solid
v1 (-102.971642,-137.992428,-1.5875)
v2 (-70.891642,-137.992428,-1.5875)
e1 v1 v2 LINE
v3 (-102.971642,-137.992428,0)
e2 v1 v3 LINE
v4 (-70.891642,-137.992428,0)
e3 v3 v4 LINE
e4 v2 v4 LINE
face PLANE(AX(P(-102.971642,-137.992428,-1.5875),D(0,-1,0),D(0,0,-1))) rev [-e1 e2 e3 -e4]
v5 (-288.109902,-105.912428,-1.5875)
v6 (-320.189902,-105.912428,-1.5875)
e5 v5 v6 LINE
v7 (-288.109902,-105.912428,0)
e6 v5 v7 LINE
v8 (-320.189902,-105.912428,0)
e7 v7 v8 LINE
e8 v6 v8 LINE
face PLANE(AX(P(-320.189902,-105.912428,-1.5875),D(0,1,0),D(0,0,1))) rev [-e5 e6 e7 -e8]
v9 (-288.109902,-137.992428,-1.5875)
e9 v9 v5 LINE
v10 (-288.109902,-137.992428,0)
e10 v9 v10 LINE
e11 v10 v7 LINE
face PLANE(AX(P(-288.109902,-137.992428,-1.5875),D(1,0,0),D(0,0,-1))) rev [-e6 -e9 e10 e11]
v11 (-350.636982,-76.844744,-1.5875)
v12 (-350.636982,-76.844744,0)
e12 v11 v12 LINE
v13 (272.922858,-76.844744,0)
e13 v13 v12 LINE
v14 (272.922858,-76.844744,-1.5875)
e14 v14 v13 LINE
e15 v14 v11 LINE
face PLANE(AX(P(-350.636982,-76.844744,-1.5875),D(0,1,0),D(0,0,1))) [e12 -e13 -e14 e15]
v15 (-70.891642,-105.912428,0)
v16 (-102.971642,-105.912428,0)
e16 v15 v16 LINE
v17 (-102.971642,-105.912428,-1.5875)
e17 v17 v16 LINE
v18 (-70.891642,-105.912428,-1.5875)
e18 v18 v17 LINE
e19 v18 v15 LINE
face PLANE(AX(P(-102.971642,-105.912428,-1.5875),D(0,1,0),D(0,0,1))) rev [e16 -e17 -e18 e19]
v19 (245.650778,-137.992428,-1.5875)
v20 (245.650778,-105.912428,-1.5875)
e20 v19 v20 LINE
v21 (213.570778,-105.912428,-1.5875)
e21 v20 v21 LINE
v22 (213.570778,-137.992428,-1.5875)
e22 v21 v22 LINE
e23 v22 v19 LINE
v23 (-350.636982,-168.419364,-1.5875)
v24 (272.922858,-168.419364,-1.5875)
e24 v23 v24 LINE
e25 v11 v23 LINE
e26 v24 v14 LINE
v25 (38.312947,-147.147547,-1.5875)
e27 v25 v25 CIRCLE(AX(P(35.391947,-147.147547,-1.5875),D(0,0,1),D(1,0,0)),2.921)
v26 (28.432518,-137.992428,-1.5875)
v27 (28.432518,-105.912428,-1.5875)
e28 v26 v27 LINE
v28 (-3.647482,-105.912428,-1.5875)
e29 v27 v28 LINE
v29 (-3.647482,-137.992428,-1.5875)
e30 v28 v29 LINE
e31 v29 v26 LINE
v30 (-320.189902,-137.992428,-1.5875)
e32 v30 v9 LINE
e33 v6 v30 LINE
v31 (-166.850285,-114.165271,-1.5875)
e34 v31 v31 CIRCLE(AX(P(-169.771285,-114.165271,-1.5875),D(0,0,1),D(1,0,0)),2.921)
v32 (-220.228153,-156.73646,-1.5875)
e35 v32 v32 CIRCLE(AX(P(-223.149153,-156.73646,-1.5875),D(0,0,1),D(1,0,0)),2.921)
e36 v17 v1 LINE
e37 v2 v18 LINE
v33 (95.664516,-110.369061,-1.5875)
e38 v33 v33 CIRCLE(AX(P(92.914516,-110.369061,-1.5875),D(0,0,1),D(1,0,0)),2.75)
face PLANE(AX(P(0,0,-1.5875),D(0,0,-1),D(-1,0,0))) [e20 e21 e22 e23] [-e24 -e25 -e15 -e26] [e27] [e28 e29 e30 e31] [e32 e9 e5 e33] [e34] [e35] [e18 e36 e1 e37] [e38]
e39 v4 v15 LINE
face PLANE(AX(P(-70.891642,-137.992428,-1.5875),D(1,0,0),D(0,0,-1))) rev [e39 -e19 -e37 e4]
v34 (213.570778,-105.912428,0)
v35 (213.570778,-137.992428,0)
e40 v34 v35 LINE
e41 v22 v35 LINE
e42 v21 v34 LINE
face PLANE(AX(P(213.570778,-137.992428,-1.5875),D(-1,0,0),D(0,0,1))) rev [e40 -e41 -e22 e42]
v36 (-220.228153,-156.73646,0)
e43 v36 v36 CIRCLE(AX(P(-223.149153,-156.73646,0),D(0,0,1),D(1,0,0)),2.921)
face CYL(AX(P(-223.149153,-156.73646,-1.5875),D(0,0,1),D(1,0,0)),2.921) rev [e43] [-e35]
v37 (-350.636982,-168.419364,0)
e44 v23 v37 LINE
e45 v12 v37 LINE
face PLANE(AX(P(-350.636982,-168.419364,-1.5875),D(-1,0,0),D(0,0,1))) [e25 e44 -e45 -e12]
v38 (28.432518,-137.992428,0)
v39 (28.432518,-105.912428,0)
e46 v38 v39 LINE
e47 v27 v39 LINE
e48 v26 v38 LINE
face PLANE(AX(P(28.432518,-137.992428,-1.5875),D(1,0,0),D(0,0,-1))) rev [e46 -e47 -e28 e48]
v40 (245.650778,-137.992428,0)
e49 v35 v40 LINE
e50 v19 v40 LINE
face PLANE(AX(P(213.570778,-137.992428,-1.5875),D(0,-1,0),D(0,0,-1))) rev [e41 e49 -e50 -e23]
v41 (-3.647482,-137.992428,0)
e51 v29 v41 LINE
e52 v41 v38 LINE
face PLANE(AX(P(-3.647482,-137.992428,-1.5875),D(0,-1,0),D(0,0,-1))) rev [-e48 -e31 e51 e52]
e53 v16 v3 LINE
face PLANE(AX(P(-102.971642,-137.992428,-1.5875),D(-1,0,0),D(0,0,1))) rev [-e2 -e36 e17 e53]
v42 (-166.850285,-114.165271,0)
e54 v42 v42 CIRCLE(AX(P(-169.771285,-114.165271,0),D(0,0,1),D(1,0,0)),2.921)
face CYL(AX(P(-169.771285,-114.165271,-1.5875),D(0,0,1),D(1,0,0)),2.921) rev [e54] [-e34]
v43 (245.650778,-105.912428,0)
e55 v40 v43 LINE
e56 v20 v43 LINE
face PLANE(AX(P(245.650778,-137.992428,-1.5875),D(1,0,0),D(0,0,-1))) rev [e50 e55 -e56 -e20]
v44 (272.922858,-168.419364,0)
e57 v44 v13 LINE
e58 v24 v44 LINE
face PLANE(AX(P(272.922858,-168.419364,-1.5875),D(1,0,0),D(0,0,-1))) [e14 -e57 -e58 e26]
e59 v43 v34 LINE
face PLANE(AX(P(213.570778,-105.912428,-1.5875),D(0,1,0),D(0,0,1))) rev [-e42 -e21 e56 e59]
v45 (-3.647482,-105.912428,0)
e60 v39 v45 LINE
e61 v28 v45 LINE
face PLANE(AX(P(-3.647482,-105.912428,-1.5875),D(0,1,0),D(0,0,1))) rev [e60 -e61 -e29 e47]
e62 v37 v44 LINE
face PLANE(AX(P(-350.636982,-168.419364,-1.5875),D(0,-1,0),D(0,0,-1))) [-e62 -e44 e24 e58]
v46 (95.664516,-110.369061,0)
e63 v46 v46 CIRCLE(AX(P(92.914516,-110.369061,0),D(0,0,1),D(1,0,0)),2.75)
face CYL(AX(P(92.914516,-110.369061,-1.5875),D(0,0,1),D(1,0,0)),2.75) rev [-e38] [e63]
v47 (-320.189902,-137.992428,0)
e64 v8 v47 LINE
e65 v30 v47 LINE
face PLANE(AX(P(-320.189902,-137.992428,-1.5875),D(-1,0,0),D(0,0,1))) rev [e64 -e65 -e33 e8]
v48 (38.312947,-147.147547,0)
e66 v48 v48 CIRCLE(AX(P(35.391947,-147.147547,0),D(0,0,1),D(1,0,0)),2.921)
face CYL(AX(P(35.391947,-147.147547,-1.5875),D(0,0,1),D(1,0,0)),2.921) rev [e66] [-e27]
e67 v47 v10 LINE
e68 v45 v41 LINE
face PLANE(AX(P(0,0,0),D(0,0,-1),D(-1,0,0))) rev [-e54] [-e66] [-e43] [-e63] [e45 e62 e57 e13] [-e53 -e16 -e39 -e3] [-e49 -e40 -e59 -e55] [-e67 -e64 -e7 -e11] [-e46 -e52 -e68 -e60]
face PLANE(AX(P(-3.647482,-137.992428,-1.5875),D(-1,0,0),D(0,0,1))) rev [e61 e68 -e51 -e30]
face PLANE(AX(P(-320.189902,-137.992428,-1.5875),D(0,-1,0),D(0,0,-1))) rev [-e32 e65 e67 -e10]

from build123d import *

# Parameters (mm, degrees)
SKETCH1_W           = 623.55984
SKETCH1_H           = 78.16342
BASE_FLANGE1_DEPTH  = 1.5875
SKETCH3_R           = 2.75
SKETCH3_R_2         = 2.921
SKETCH3_W           = 32.08
SKETCH3_H           = 32.08
CUT_EXTRUDE3_DEPTH  = 389.990867909
SKETCH6_W           = 623.55984
SKETCH6_H           = 13.4112
BOSS_EXTRUDE1_DEPTH = 1.5875


# Sheet-metal steps are written as plain solids
with BuildPart() as part:
    # Sketch1 → Base-Flange1 (new body)
    with BuildSketch(Plane.XY):
        with Locations((-38.857061865, -129.337653818)):
            Rectangle(SKETCH1_W, SKETCH1_H)
    extrude(amount=-BASE_FLANGE1_DEPTH)

    # Sketch3 → Cut-Extrude3 (cut, through all)
    with BuildSketch(Plane.XY):
        with Locations((92.914515529, -110.369060902)):
            Circle(SKETCH3_R)
        with Locations((35.391947046, -147.147547142)):
            Circle(SKETCH3_R_2)
        with Locations((-169.771284735, -114.165270711)):
            Circle(SKETCH3_R_2)
        with Locations((-223.149152531, -156.736460083)):
            Circle(SKETCH3_R_2)
        with Locations((-304.149901865, -121.952427932)):
            Rectangle(SKETCH3_W, SKETCH3_H)
        with Locations((-86.931641865, -121.952427932)):
            Rectangle(SKETCH3_W, SKETCH3_H)
        with Locations((12.392518135, -121.952427932)):
            Rectangle(SKETCH3_W, SKETCH3_H)
        with Locations((229.610778135, -121.952427932)):
            Rectangle(SKETCH3_W, SKETCH3_H)
    extrude(amount=-CUT_EXTRUDE3_DEPTH, mode=Mode.SUBTRACT)

    # Sketch6 → Boss-Extrude1 (add, through all)
    with BuildSketch(Plane.XY):
        with Locations((-38.857061865, -83.550343818)):
            Rectangle(SKETCH6_W, SKETCH6_H)
    extrude(amount=-BOSS_EXTRUDE1_DEPTH)


solid = part.part
